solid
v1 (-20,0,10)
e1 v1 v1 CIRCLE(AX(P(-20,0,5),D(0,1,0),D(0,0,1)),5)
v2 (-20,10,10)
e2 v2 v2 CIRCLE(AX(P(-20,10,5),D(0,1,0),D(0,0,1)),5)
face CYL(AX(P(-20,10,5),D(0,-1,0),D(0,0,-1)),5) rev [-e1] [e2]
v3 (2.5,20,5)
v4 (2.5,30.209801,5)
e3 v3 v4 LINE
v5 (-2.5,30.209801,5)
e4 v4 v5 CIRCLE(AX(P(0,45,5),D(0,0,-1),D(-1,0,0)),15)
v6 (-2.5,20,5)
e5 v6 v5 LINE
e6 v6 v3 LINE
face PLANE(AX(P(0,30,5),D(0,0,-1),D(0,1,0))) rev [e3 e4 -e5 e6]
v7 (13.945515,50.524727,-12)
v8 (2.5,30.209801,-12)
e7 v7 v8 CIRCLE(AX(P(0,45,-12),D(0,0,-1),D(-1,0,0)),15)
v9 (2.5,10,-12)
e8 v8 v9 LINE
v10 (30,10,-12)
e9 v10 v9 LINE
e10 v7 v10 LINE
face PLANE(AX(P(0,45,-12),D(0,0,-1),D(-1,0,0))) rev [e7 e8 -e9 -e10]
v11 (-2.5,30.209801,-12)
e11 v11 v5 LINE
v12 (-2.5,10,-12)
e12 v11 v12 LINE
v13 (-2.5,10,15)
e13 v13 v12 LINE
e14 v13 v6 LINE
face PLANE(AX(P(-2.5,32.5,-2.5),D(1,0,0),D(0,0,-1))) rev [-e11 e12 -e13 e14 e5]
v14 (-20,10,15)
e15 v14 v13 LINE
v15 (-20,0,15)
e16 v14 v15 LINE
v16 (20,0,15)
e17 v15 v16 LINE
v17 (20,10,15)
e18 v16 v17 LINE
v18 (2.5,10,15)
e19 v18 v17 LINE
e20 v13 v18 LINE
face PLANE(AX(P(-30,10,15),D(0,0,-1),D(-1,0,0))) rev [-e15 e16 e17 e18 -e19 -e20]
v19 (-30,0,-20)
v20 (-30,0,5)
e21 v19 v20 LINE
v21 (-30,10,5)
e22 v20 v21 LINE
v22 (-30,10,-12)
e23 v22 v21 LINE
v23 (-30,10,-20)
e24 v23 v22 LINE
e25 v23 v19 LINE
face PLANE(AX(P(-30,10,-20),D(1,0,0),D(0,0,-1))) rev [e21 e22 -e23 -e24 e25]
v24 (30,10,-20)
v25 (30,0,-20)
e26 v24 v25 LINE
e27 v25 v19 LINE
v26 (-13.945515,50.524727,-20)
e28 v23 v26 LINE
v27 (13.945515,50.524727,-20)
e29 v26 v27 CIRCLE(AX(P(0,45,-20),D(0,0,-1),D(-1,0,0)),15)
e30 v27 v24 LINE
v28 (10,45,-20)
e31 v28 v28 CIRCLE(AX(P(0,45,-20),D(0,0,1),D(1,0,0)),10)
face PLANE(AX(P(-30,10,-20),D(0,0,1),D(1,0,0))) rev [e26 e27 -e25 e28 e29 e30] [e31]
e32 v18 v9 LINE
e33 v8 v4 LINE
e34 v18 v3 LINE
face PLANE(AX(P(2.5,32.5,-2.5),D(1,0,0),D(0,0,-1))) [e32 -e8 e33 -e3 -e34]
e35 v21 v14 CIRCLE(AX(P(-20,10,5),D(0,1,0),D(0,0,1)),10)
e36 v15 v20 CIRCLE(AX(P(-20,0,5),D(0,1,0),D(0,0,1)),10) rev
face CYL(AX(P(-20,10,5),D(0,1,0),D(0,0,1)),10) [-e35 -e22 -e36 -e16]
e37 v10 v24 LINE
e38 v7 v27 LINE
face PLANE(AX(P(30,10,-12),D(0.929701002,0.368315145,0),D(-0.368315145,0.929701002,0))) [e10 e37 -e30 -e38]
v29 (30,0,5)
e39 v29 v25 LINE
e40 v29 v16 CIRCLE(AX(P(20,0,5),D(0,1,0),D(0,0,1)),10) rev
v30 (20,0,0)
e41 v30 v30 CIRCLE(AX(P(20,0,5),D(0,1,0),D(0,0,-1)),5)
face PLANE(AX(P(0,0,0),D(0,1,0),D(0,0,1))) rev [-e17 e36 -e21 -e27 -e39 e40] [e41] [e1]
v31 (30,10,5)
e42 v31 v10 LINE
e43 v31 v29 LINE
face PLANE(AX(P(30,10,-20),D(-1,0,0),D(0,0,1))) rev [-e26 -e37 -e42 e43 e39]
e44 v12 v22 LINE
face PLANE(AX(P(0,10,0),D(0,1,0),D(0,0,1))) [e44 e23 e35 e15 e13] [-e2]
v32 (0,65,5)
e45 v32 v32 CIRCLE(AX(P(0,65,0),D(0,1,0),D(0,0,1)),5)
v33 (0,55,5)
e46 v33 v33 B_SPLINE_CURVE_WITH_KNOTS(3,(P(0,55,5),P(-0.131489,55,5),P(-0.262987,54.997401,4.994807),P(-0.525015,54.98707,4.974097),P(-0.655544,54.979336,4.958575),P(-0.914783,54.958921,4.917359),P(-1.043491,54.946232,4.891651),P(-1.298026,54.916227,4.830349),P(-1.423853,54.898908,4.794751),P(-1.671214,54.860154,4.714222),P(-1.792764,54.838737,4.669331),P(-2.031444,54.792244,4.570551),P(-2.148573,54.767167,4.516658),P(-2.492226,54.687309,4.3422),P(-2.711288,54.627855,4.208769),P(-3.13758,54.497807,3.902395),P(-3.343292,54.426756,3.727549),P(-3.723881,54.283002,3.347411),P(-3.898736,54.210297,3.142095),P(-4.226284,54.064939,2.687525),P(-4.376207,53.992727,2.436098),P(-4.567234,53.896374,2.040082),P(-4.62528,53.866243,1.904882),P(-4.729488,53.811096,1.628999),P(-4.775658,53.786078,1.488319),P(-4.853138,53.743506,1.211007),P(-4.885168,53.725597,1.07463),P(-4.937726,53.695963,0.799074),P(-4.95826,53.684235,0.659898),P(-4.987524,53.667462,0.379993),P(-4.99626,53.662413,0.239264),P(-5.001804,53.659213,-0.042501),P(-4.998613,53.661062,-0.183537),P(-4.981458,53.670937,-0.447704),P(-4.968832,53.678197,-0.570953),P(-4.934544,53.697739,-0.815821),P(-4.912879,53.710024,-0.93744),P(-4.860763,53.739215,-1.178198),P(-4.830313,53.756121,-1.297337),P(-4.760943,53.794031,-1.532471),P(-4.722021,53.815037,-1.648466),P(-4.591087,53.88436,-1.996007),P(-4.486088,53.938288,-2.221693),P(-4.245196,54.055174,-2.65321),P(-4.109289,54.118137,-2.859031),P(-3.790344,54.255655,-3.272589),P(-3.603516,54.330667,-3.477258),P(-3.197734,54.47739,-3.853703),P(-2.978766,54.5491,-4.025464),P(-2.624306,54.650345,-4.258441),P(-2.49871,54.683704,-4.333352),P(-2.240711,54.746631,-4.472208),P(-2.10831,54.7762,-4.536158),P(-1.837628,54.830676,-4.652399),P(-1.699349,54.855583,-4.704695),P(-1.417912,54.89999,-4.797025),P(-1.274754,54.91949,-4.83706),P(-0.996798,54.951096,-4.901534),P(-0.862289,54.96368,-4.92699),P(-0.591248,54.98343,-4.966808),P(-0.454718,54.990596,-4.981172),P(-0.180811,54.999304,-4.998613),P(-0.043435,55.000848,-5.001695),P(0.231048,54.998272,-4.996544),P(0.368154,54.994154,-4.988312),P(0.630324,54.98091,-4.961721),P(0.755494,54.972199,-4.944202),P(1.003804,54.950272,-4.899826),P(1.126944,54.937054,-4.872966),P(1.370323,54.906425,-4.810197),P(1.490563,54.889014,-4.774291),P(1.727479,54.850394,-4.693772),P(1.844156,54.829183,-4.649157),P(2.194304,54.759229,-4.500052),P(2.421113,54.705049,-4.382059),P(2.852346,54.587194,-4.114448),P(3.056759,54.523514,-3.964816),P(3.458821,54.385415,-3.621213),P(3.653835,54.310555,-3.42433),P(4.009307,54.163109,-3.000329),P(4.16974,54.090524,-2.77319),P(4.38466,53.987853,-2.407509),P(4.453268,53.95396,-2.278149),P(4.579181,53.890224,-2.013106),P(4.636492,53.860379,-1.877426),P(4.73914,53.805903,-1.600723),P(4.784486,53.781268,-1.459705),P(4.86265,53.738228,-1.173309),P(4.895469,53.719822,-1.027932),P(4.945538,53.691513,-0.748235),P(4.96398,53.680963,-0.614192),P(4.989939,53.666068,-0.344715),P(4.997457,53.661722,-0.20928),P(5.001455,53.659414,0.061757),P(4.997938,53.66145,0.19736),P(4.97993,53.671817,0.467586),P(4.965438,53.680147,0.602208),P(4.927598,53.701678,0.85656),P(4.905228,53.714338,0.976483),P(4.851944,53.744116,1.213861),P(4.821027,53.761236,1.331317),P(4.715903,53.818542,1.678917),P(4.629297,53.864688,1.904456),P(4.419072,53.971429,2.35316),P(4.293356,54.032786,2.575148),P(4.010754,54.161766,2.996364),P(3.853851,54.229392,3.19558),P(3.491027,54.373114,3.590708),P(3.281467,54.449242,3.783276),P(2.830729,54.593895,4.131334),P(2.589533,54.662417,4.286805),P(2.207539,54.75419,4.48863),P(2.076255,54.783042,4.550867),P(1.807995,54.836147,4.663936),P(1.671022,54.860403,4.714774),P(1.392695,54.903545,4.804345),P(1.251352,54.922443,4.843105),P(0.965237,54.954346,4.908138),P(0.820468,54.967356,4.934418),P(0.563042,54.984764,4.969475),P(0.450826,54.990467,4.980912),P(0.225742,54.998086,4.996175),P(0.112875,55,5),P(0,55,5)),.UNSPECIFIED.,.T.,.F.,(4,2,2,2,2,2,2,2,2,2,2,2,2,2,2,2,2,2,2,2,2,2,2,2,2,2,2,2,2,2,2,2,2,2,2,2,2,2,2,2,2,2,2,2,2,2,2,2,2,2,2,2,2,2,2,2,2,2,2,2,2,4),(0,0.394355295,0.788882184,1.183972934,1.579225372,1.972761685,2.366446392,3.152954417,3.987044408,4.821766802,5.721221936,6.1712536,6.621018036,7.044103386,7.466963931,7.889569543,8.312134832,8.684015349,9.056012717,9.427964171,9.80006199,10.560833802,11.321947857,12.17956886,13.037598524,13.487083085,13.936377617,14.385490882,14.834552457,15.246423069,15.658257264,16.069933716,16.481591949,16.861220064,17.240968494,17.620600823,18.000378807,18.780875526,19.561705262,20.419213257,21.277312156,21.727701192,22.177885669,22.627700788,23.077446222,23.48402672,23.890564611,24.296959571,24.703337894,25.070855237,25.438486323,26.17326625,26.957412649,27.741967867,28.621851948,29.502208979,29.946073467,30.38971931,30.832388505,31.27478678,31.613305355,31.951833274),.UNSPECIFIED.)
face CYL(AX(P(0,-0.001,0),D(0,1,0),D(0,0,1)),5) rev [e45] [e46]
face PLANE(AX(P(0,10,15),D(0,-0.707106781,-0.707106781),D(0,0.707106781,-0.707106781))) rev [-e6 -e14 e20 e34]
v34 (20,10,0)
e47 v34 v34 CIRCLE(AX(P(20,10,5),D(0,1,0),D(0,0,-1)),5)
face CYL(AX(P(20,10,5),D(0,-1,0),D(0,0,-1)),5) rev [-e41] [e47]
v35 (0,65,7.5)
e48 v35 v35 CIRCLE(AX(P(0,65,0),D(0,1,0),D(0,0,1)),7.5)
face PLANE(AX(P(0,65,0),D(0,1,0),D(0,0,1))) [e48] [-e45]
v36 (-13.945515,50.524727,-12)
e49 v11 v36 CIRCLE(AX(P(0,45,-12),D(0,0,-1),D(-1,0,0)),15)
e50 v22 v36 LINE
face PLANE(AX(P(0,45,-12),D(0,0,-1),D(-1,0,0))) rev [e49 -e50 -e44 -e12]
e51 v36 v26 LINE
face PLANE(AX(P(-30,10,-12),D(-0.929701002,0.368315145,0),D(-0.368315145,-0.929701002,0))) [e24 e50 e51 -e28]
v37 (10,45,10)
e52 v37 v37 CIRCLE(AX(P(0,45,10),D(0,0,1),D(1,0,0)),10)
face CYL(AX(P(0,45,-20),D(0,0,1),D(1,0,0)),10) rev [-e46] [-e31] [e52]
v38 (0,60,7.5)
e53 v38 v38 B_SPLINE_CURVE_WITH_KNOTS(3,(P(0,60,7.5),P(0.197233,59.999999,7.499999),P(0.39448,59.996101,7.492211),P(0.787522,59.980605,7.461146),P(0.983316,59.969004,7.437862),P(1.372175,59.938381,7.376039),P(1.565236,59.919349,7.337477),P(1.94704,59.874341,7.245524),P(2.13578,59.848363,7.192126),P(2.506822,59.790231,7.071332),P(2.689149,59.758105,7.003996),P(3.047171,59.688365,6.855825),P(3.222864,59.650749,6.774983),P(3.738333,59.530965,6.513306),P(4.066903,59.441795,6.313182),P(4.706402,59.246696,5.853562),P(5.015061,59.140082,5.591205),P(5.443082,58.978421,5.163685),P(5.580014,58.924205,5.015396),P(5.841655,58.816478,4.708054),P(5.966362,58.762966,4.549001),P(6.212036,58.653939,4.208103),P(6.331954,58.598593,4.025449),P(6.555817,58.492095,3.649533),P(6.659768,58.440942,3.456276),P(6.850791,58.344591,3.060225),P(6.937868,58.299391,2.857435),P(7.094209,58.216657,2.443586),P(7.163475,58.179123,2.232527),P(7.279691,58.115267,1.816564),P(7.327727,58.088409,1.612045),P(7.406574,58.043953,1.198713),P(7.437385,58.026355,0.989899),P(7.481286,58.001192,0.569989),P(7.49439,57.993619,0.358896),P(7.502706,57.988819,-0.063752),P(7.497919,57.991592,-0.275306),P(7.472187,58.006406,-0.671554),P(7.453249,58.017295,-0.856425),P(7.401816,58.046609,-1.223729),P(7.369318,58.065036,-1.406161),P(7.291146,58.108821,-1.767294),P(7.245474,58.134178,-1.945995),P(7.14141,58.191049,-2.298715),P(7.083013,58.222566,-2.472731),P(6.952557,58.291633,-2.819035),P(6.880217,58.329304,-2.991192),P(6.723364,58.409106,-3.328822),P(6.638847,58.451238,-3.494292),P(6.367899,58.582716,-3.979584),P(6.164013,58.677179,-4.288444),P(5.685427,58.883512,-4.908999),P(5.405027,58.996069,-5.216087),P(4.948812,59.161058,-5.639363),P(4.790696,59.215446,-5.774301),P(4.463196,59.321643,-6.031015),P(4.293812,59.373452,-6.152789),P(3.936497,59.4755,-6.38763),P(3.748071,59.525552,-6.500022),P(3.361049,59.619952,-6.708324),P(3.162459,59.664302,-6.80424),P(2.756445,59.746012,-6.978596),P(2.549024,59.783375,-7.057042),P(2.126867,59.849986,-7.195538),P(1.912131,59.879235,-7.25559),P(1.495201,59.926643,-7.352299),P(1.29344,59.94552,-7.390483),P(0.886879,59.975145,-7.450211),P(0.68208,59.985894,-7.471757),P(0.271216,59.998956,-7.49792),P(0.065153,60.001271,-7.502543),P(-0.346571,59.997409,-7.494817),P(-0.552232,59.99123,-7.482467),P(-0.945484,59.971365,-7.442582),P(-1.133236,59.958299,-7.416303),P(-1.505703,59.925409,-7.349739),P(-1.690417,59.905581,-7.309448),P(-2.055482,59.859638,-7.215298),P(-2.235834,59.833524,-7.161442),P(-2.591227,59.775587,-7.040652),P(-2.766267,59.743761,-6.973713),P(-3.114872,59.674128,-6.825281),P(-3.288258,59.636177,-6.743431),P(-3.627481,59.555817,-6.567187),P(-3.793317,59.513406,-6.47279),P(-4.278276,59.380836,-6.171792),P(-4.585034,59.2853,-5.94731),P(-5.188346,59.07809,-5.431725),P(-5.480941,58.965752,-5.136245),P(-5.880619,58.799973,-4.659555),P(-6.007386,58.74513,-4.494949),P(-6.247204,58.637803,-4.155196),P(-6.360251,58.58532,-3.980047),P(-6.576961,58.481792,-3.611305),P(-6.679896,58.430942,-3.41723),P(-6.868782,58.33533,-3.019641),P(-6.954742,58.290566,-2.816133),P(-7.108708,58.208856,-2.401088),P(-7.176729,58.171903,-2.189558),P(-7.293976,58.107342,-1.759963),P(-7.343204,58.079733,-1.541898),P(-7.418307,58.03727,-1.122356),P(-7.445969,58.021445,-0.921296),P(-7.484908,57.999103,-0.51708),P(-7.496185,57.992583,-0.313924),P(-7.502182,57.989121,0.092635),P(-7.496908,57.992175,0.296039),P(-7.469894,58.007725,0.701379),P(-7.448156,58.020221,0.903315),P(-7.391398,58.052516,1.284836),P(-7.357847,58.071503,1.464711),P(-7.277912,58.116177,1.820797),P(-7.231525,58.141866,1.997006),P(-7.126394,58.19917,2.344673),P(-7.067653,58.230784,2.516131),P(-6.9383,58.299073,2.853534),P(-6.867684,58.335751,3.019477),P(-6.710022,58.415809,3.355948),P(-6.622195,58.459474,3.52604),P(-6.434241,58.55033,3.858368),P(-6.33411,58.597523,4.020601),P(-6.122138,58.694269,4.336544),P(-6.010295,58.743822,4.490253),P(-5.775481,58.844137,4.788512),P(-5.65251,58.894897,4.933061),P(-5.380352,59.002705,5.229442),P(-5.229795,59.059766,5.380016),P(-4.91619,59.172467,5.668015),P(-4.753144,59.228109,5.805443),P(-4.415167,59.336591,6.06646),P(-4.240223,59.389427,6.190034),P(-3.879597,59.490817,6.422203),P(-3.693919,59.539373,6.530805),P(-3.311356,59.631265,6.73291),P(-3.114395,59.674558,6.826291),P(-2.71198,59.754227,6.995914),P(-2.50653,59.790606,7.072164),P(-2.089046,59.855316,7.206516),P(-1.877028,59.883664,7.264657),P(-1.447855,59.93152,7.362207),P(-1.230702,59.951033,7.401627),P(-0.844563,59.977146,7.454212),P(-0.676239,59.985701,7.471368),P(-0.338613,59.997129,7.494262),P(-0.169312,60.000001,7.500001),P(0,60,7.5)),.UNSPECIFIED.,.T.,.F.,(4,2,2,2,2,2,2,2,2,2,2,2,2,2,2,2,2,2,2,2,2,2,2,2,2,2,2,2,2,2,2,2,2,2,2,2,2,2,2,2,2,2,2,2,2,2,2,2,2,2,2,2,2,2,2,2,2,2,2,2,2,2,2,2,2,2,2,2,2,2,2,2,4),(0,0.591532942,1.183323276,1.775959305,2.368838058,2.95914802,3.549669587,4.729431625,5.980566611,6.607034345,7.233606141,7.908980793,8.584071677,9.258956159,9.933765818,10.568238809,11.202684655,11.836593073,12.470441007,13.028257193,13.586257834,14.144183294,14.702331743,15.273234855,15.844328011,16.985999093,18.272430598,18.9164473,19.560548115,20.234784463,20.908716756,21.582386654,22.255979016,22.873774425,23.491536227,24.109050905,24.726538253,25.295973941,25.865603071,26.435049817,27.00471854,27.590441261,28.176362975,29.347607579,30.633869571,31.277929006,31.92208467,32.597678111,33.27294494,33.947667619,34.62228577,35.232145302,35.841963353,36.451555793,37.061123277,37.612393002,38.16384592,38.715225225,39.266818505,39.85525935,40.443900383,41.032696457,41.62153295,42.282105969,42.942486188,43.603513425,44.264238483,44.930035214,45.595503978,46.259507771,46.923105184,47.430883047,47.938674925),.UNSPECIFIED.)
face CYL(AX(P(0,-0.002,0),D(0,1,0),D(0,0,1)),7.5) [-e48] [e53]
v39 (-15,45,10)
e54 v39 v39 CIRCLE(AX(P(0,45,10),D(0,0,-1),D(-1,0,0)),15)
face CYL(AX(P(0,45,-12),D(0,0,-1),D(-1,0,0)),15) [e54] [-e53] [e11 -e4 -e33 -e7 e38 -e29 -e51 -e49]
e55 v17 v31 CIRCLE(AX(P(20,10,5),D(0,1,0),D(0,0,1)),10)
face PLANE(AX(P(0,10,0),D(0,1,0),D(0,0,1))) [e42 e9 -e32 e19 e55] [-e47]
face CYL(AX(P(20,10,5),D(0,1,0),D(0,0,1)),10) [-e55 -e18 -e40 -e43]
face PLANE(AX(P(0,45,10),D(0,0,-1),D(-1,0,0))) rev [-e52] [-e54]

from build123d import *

# Parameters (mm, degrees)
SKETCH_4_W               = 60
SKETCH_4_H               = 35
SKETCH_4_R               = 5
EXTRUDE_1_DEPTH          = 10
FILLET_1_R               = 10
FILLET_2_R               = 10
EXTRUDE_2_DEPTH          = 8
SKETCH_6_R               = 15
EXTRUDE_3_DEPTH          = 30
SKETCH_8_R               = 10
CUT_EXTRUDE_1_DEPTH      = 74.484692283
EXTRUDE_4_REACH          = 76.33
EXTRUDE_4_END_RADIUS     = 15
SKETCH_9_R               = 7.5
CUT_EXTRUDE_2_REACH      = 76.33
CUT_EXTRUDE_2_END_RADIUS = 10
SKETCH_10_R              = 5
RIB_START                = -2.5
RIB_1_DEPTH              = 5


# Read off the part's stored shape, not the designer's step: 筋1
with BuildPart() as part:
    # 草图4 → 凸台-拉伸1 (new body)
    with BuildSketch(Plane(origin=(0, 0, 0), x_dir=(1, 0, 0), z_dir=(0, 1, 0))):
        with Locations((0, 2.5)):
            Rectangle(SKETCH_4_W, SKETCH_4_H)
        with Locations(Location((-20, -5, 0), (0, 0, 270))):
            Circle(SKETCH_4_R, mode=Mode.SUBTRACT)
        with Locations(Location((20, -5, 0), (0, 0, 90))):
            Circle(SKETCH_4_R, mode=Mode.SUBTRACT)
    extrude(amount=EXTRUDE_1_DEPTH)

    # 圆角1
    fillet_1_edges = [part.edges().sort_by_distance(p)[0] for p in [
        (-30, 5, 15),
    ]]
    fillet(fillet_1_edges, radius=FILLET_1_R)

    # 圆角2
    fillet_2_edges = [part.edges().sort_by_distance(p)[0] for p in [
        (30, 5, 15),
    ]]
    fillet(fillet_2_edges, radius=FILLET_2_R)

    # 草图5 → 凸台-拉伸2 (add)
    with BuildSketch(Plane(origin=(0, 0, -20), x_dir=(-1, 0, 0), z_dir=(0, 0, -1))):
        with BuildLine():
            Line((-30, 10), (-13.945515037, 50.524727174))
            ThreePointArc((-13.945515037, 50.524727174), (0, 60), (13.945515037, 50.524727174))
            Line((13.945515037, 50.524727174), (30, 10))
            Line((30, 10), (-30, 10))
        make_face()
    extrude(amount=-EXTRUDE_2_DEPTH)

    # 草图6 → 凸台-拉伸3 (add)
    with BuildSketch(Plane(origin=(0, 0, -20), x_dir=(-1, 0, 0), z_dir=(0, 0, -1))):
        with Locations((0, 45)):
            Circle(SKETCH_6_R)
    extrude(amount=-EXTRUDE_3_DEPTH)

    # 草图8 → 切除-拉伸1 (cut, through all)
    with BuildSketch(Plane.XY.offset(10)):
        with Locations((0, 45)):
            Circle(SKETCH_8_R)
    extrude(amount=-CUT_EXTRUDE_1_DEPTH, mode=Mode.SUBTRACT)

    # 凸台-拉伸4: up to this cylinder (the profile starts outside it)
    extrude_4_end = Plane(origin=(0, 45, 0), z_dir=(0, 0, -1)) * Cylinder(EXTRUDE_4_END_RADIUS, 183.66, mode=Mode.PRIVATE)
    # 草图9 → 凸台-拉伸4 (add, up to the surface)
    with BuildSketch(Plane(origin=(0, 65, 0), x_dir=(1, 0, 0), z_dir=(0, 1, 0)), mode=Mode.PRIVATE) as extrude_4_sk1:
        with Locations(Location((0, 0, 0), (0, 0, 270))):
            Circle(SKETCH_9_R)
    extrude_4_tool1 = extrude(extrude_4_sk1.sketch, amount=-EXTRUDE_4_REACH, mode=Mode.PRIVATE) - extrude_4_end
    add(extrude_4_tool1.solids().sort_by_distance((0, 65, 0))[0])

    # 切除-拉伸2: up to this cylinder (the profile starts outside it)
    cut_extrude_2_end = Plane(origin=(0, 45, 0), z_dir=(0, 0, 1)) * Cylinder(CUT_EXTRUDE_2_END_RADIUS, 173.66, mode=Mode.PRIVATE)
    # 草图10 → 切除-拉伸2 (cut, up to the surface)
    with BuildSketch(Plane(origin=(0, 65, 0), x_dir=(1, 0, 0), z_dir=(0, 1, 0)), mode=Mode.PRIVATE) as cut_extrude_2_sk1:
        with Locations(Location((0, 0, 0), (0, 0, 270))):
            Circle(SKETCH_10_R)
    cut_extrude_2_tool1 = extrude(cut_extrude_2_sk1.sketch, amount=-CUT_EXTRUDE_2_REACH, mode=Mode.PRIVATE) - cut_extrude_2_end
    add(cut_extrude_2_tool1.solids().sort_by_distance((0, 65, 0))[0], mode=Mode.SUBTRACT)

    # 筋1 outline → 筋1 (add)
    with BuildSketch(Plane(origin=(0, 0, 0), x_dir=(0, 0, -1), z_dir=(1, 0, 0)).offset(RIB_START)):
        Polygon((-5, 32), (-5, 20), (-15, 10), (12, 10), (12, 32), align=None)
    extrude(amount=RIB_1_DEPTH)


solid = part.part
